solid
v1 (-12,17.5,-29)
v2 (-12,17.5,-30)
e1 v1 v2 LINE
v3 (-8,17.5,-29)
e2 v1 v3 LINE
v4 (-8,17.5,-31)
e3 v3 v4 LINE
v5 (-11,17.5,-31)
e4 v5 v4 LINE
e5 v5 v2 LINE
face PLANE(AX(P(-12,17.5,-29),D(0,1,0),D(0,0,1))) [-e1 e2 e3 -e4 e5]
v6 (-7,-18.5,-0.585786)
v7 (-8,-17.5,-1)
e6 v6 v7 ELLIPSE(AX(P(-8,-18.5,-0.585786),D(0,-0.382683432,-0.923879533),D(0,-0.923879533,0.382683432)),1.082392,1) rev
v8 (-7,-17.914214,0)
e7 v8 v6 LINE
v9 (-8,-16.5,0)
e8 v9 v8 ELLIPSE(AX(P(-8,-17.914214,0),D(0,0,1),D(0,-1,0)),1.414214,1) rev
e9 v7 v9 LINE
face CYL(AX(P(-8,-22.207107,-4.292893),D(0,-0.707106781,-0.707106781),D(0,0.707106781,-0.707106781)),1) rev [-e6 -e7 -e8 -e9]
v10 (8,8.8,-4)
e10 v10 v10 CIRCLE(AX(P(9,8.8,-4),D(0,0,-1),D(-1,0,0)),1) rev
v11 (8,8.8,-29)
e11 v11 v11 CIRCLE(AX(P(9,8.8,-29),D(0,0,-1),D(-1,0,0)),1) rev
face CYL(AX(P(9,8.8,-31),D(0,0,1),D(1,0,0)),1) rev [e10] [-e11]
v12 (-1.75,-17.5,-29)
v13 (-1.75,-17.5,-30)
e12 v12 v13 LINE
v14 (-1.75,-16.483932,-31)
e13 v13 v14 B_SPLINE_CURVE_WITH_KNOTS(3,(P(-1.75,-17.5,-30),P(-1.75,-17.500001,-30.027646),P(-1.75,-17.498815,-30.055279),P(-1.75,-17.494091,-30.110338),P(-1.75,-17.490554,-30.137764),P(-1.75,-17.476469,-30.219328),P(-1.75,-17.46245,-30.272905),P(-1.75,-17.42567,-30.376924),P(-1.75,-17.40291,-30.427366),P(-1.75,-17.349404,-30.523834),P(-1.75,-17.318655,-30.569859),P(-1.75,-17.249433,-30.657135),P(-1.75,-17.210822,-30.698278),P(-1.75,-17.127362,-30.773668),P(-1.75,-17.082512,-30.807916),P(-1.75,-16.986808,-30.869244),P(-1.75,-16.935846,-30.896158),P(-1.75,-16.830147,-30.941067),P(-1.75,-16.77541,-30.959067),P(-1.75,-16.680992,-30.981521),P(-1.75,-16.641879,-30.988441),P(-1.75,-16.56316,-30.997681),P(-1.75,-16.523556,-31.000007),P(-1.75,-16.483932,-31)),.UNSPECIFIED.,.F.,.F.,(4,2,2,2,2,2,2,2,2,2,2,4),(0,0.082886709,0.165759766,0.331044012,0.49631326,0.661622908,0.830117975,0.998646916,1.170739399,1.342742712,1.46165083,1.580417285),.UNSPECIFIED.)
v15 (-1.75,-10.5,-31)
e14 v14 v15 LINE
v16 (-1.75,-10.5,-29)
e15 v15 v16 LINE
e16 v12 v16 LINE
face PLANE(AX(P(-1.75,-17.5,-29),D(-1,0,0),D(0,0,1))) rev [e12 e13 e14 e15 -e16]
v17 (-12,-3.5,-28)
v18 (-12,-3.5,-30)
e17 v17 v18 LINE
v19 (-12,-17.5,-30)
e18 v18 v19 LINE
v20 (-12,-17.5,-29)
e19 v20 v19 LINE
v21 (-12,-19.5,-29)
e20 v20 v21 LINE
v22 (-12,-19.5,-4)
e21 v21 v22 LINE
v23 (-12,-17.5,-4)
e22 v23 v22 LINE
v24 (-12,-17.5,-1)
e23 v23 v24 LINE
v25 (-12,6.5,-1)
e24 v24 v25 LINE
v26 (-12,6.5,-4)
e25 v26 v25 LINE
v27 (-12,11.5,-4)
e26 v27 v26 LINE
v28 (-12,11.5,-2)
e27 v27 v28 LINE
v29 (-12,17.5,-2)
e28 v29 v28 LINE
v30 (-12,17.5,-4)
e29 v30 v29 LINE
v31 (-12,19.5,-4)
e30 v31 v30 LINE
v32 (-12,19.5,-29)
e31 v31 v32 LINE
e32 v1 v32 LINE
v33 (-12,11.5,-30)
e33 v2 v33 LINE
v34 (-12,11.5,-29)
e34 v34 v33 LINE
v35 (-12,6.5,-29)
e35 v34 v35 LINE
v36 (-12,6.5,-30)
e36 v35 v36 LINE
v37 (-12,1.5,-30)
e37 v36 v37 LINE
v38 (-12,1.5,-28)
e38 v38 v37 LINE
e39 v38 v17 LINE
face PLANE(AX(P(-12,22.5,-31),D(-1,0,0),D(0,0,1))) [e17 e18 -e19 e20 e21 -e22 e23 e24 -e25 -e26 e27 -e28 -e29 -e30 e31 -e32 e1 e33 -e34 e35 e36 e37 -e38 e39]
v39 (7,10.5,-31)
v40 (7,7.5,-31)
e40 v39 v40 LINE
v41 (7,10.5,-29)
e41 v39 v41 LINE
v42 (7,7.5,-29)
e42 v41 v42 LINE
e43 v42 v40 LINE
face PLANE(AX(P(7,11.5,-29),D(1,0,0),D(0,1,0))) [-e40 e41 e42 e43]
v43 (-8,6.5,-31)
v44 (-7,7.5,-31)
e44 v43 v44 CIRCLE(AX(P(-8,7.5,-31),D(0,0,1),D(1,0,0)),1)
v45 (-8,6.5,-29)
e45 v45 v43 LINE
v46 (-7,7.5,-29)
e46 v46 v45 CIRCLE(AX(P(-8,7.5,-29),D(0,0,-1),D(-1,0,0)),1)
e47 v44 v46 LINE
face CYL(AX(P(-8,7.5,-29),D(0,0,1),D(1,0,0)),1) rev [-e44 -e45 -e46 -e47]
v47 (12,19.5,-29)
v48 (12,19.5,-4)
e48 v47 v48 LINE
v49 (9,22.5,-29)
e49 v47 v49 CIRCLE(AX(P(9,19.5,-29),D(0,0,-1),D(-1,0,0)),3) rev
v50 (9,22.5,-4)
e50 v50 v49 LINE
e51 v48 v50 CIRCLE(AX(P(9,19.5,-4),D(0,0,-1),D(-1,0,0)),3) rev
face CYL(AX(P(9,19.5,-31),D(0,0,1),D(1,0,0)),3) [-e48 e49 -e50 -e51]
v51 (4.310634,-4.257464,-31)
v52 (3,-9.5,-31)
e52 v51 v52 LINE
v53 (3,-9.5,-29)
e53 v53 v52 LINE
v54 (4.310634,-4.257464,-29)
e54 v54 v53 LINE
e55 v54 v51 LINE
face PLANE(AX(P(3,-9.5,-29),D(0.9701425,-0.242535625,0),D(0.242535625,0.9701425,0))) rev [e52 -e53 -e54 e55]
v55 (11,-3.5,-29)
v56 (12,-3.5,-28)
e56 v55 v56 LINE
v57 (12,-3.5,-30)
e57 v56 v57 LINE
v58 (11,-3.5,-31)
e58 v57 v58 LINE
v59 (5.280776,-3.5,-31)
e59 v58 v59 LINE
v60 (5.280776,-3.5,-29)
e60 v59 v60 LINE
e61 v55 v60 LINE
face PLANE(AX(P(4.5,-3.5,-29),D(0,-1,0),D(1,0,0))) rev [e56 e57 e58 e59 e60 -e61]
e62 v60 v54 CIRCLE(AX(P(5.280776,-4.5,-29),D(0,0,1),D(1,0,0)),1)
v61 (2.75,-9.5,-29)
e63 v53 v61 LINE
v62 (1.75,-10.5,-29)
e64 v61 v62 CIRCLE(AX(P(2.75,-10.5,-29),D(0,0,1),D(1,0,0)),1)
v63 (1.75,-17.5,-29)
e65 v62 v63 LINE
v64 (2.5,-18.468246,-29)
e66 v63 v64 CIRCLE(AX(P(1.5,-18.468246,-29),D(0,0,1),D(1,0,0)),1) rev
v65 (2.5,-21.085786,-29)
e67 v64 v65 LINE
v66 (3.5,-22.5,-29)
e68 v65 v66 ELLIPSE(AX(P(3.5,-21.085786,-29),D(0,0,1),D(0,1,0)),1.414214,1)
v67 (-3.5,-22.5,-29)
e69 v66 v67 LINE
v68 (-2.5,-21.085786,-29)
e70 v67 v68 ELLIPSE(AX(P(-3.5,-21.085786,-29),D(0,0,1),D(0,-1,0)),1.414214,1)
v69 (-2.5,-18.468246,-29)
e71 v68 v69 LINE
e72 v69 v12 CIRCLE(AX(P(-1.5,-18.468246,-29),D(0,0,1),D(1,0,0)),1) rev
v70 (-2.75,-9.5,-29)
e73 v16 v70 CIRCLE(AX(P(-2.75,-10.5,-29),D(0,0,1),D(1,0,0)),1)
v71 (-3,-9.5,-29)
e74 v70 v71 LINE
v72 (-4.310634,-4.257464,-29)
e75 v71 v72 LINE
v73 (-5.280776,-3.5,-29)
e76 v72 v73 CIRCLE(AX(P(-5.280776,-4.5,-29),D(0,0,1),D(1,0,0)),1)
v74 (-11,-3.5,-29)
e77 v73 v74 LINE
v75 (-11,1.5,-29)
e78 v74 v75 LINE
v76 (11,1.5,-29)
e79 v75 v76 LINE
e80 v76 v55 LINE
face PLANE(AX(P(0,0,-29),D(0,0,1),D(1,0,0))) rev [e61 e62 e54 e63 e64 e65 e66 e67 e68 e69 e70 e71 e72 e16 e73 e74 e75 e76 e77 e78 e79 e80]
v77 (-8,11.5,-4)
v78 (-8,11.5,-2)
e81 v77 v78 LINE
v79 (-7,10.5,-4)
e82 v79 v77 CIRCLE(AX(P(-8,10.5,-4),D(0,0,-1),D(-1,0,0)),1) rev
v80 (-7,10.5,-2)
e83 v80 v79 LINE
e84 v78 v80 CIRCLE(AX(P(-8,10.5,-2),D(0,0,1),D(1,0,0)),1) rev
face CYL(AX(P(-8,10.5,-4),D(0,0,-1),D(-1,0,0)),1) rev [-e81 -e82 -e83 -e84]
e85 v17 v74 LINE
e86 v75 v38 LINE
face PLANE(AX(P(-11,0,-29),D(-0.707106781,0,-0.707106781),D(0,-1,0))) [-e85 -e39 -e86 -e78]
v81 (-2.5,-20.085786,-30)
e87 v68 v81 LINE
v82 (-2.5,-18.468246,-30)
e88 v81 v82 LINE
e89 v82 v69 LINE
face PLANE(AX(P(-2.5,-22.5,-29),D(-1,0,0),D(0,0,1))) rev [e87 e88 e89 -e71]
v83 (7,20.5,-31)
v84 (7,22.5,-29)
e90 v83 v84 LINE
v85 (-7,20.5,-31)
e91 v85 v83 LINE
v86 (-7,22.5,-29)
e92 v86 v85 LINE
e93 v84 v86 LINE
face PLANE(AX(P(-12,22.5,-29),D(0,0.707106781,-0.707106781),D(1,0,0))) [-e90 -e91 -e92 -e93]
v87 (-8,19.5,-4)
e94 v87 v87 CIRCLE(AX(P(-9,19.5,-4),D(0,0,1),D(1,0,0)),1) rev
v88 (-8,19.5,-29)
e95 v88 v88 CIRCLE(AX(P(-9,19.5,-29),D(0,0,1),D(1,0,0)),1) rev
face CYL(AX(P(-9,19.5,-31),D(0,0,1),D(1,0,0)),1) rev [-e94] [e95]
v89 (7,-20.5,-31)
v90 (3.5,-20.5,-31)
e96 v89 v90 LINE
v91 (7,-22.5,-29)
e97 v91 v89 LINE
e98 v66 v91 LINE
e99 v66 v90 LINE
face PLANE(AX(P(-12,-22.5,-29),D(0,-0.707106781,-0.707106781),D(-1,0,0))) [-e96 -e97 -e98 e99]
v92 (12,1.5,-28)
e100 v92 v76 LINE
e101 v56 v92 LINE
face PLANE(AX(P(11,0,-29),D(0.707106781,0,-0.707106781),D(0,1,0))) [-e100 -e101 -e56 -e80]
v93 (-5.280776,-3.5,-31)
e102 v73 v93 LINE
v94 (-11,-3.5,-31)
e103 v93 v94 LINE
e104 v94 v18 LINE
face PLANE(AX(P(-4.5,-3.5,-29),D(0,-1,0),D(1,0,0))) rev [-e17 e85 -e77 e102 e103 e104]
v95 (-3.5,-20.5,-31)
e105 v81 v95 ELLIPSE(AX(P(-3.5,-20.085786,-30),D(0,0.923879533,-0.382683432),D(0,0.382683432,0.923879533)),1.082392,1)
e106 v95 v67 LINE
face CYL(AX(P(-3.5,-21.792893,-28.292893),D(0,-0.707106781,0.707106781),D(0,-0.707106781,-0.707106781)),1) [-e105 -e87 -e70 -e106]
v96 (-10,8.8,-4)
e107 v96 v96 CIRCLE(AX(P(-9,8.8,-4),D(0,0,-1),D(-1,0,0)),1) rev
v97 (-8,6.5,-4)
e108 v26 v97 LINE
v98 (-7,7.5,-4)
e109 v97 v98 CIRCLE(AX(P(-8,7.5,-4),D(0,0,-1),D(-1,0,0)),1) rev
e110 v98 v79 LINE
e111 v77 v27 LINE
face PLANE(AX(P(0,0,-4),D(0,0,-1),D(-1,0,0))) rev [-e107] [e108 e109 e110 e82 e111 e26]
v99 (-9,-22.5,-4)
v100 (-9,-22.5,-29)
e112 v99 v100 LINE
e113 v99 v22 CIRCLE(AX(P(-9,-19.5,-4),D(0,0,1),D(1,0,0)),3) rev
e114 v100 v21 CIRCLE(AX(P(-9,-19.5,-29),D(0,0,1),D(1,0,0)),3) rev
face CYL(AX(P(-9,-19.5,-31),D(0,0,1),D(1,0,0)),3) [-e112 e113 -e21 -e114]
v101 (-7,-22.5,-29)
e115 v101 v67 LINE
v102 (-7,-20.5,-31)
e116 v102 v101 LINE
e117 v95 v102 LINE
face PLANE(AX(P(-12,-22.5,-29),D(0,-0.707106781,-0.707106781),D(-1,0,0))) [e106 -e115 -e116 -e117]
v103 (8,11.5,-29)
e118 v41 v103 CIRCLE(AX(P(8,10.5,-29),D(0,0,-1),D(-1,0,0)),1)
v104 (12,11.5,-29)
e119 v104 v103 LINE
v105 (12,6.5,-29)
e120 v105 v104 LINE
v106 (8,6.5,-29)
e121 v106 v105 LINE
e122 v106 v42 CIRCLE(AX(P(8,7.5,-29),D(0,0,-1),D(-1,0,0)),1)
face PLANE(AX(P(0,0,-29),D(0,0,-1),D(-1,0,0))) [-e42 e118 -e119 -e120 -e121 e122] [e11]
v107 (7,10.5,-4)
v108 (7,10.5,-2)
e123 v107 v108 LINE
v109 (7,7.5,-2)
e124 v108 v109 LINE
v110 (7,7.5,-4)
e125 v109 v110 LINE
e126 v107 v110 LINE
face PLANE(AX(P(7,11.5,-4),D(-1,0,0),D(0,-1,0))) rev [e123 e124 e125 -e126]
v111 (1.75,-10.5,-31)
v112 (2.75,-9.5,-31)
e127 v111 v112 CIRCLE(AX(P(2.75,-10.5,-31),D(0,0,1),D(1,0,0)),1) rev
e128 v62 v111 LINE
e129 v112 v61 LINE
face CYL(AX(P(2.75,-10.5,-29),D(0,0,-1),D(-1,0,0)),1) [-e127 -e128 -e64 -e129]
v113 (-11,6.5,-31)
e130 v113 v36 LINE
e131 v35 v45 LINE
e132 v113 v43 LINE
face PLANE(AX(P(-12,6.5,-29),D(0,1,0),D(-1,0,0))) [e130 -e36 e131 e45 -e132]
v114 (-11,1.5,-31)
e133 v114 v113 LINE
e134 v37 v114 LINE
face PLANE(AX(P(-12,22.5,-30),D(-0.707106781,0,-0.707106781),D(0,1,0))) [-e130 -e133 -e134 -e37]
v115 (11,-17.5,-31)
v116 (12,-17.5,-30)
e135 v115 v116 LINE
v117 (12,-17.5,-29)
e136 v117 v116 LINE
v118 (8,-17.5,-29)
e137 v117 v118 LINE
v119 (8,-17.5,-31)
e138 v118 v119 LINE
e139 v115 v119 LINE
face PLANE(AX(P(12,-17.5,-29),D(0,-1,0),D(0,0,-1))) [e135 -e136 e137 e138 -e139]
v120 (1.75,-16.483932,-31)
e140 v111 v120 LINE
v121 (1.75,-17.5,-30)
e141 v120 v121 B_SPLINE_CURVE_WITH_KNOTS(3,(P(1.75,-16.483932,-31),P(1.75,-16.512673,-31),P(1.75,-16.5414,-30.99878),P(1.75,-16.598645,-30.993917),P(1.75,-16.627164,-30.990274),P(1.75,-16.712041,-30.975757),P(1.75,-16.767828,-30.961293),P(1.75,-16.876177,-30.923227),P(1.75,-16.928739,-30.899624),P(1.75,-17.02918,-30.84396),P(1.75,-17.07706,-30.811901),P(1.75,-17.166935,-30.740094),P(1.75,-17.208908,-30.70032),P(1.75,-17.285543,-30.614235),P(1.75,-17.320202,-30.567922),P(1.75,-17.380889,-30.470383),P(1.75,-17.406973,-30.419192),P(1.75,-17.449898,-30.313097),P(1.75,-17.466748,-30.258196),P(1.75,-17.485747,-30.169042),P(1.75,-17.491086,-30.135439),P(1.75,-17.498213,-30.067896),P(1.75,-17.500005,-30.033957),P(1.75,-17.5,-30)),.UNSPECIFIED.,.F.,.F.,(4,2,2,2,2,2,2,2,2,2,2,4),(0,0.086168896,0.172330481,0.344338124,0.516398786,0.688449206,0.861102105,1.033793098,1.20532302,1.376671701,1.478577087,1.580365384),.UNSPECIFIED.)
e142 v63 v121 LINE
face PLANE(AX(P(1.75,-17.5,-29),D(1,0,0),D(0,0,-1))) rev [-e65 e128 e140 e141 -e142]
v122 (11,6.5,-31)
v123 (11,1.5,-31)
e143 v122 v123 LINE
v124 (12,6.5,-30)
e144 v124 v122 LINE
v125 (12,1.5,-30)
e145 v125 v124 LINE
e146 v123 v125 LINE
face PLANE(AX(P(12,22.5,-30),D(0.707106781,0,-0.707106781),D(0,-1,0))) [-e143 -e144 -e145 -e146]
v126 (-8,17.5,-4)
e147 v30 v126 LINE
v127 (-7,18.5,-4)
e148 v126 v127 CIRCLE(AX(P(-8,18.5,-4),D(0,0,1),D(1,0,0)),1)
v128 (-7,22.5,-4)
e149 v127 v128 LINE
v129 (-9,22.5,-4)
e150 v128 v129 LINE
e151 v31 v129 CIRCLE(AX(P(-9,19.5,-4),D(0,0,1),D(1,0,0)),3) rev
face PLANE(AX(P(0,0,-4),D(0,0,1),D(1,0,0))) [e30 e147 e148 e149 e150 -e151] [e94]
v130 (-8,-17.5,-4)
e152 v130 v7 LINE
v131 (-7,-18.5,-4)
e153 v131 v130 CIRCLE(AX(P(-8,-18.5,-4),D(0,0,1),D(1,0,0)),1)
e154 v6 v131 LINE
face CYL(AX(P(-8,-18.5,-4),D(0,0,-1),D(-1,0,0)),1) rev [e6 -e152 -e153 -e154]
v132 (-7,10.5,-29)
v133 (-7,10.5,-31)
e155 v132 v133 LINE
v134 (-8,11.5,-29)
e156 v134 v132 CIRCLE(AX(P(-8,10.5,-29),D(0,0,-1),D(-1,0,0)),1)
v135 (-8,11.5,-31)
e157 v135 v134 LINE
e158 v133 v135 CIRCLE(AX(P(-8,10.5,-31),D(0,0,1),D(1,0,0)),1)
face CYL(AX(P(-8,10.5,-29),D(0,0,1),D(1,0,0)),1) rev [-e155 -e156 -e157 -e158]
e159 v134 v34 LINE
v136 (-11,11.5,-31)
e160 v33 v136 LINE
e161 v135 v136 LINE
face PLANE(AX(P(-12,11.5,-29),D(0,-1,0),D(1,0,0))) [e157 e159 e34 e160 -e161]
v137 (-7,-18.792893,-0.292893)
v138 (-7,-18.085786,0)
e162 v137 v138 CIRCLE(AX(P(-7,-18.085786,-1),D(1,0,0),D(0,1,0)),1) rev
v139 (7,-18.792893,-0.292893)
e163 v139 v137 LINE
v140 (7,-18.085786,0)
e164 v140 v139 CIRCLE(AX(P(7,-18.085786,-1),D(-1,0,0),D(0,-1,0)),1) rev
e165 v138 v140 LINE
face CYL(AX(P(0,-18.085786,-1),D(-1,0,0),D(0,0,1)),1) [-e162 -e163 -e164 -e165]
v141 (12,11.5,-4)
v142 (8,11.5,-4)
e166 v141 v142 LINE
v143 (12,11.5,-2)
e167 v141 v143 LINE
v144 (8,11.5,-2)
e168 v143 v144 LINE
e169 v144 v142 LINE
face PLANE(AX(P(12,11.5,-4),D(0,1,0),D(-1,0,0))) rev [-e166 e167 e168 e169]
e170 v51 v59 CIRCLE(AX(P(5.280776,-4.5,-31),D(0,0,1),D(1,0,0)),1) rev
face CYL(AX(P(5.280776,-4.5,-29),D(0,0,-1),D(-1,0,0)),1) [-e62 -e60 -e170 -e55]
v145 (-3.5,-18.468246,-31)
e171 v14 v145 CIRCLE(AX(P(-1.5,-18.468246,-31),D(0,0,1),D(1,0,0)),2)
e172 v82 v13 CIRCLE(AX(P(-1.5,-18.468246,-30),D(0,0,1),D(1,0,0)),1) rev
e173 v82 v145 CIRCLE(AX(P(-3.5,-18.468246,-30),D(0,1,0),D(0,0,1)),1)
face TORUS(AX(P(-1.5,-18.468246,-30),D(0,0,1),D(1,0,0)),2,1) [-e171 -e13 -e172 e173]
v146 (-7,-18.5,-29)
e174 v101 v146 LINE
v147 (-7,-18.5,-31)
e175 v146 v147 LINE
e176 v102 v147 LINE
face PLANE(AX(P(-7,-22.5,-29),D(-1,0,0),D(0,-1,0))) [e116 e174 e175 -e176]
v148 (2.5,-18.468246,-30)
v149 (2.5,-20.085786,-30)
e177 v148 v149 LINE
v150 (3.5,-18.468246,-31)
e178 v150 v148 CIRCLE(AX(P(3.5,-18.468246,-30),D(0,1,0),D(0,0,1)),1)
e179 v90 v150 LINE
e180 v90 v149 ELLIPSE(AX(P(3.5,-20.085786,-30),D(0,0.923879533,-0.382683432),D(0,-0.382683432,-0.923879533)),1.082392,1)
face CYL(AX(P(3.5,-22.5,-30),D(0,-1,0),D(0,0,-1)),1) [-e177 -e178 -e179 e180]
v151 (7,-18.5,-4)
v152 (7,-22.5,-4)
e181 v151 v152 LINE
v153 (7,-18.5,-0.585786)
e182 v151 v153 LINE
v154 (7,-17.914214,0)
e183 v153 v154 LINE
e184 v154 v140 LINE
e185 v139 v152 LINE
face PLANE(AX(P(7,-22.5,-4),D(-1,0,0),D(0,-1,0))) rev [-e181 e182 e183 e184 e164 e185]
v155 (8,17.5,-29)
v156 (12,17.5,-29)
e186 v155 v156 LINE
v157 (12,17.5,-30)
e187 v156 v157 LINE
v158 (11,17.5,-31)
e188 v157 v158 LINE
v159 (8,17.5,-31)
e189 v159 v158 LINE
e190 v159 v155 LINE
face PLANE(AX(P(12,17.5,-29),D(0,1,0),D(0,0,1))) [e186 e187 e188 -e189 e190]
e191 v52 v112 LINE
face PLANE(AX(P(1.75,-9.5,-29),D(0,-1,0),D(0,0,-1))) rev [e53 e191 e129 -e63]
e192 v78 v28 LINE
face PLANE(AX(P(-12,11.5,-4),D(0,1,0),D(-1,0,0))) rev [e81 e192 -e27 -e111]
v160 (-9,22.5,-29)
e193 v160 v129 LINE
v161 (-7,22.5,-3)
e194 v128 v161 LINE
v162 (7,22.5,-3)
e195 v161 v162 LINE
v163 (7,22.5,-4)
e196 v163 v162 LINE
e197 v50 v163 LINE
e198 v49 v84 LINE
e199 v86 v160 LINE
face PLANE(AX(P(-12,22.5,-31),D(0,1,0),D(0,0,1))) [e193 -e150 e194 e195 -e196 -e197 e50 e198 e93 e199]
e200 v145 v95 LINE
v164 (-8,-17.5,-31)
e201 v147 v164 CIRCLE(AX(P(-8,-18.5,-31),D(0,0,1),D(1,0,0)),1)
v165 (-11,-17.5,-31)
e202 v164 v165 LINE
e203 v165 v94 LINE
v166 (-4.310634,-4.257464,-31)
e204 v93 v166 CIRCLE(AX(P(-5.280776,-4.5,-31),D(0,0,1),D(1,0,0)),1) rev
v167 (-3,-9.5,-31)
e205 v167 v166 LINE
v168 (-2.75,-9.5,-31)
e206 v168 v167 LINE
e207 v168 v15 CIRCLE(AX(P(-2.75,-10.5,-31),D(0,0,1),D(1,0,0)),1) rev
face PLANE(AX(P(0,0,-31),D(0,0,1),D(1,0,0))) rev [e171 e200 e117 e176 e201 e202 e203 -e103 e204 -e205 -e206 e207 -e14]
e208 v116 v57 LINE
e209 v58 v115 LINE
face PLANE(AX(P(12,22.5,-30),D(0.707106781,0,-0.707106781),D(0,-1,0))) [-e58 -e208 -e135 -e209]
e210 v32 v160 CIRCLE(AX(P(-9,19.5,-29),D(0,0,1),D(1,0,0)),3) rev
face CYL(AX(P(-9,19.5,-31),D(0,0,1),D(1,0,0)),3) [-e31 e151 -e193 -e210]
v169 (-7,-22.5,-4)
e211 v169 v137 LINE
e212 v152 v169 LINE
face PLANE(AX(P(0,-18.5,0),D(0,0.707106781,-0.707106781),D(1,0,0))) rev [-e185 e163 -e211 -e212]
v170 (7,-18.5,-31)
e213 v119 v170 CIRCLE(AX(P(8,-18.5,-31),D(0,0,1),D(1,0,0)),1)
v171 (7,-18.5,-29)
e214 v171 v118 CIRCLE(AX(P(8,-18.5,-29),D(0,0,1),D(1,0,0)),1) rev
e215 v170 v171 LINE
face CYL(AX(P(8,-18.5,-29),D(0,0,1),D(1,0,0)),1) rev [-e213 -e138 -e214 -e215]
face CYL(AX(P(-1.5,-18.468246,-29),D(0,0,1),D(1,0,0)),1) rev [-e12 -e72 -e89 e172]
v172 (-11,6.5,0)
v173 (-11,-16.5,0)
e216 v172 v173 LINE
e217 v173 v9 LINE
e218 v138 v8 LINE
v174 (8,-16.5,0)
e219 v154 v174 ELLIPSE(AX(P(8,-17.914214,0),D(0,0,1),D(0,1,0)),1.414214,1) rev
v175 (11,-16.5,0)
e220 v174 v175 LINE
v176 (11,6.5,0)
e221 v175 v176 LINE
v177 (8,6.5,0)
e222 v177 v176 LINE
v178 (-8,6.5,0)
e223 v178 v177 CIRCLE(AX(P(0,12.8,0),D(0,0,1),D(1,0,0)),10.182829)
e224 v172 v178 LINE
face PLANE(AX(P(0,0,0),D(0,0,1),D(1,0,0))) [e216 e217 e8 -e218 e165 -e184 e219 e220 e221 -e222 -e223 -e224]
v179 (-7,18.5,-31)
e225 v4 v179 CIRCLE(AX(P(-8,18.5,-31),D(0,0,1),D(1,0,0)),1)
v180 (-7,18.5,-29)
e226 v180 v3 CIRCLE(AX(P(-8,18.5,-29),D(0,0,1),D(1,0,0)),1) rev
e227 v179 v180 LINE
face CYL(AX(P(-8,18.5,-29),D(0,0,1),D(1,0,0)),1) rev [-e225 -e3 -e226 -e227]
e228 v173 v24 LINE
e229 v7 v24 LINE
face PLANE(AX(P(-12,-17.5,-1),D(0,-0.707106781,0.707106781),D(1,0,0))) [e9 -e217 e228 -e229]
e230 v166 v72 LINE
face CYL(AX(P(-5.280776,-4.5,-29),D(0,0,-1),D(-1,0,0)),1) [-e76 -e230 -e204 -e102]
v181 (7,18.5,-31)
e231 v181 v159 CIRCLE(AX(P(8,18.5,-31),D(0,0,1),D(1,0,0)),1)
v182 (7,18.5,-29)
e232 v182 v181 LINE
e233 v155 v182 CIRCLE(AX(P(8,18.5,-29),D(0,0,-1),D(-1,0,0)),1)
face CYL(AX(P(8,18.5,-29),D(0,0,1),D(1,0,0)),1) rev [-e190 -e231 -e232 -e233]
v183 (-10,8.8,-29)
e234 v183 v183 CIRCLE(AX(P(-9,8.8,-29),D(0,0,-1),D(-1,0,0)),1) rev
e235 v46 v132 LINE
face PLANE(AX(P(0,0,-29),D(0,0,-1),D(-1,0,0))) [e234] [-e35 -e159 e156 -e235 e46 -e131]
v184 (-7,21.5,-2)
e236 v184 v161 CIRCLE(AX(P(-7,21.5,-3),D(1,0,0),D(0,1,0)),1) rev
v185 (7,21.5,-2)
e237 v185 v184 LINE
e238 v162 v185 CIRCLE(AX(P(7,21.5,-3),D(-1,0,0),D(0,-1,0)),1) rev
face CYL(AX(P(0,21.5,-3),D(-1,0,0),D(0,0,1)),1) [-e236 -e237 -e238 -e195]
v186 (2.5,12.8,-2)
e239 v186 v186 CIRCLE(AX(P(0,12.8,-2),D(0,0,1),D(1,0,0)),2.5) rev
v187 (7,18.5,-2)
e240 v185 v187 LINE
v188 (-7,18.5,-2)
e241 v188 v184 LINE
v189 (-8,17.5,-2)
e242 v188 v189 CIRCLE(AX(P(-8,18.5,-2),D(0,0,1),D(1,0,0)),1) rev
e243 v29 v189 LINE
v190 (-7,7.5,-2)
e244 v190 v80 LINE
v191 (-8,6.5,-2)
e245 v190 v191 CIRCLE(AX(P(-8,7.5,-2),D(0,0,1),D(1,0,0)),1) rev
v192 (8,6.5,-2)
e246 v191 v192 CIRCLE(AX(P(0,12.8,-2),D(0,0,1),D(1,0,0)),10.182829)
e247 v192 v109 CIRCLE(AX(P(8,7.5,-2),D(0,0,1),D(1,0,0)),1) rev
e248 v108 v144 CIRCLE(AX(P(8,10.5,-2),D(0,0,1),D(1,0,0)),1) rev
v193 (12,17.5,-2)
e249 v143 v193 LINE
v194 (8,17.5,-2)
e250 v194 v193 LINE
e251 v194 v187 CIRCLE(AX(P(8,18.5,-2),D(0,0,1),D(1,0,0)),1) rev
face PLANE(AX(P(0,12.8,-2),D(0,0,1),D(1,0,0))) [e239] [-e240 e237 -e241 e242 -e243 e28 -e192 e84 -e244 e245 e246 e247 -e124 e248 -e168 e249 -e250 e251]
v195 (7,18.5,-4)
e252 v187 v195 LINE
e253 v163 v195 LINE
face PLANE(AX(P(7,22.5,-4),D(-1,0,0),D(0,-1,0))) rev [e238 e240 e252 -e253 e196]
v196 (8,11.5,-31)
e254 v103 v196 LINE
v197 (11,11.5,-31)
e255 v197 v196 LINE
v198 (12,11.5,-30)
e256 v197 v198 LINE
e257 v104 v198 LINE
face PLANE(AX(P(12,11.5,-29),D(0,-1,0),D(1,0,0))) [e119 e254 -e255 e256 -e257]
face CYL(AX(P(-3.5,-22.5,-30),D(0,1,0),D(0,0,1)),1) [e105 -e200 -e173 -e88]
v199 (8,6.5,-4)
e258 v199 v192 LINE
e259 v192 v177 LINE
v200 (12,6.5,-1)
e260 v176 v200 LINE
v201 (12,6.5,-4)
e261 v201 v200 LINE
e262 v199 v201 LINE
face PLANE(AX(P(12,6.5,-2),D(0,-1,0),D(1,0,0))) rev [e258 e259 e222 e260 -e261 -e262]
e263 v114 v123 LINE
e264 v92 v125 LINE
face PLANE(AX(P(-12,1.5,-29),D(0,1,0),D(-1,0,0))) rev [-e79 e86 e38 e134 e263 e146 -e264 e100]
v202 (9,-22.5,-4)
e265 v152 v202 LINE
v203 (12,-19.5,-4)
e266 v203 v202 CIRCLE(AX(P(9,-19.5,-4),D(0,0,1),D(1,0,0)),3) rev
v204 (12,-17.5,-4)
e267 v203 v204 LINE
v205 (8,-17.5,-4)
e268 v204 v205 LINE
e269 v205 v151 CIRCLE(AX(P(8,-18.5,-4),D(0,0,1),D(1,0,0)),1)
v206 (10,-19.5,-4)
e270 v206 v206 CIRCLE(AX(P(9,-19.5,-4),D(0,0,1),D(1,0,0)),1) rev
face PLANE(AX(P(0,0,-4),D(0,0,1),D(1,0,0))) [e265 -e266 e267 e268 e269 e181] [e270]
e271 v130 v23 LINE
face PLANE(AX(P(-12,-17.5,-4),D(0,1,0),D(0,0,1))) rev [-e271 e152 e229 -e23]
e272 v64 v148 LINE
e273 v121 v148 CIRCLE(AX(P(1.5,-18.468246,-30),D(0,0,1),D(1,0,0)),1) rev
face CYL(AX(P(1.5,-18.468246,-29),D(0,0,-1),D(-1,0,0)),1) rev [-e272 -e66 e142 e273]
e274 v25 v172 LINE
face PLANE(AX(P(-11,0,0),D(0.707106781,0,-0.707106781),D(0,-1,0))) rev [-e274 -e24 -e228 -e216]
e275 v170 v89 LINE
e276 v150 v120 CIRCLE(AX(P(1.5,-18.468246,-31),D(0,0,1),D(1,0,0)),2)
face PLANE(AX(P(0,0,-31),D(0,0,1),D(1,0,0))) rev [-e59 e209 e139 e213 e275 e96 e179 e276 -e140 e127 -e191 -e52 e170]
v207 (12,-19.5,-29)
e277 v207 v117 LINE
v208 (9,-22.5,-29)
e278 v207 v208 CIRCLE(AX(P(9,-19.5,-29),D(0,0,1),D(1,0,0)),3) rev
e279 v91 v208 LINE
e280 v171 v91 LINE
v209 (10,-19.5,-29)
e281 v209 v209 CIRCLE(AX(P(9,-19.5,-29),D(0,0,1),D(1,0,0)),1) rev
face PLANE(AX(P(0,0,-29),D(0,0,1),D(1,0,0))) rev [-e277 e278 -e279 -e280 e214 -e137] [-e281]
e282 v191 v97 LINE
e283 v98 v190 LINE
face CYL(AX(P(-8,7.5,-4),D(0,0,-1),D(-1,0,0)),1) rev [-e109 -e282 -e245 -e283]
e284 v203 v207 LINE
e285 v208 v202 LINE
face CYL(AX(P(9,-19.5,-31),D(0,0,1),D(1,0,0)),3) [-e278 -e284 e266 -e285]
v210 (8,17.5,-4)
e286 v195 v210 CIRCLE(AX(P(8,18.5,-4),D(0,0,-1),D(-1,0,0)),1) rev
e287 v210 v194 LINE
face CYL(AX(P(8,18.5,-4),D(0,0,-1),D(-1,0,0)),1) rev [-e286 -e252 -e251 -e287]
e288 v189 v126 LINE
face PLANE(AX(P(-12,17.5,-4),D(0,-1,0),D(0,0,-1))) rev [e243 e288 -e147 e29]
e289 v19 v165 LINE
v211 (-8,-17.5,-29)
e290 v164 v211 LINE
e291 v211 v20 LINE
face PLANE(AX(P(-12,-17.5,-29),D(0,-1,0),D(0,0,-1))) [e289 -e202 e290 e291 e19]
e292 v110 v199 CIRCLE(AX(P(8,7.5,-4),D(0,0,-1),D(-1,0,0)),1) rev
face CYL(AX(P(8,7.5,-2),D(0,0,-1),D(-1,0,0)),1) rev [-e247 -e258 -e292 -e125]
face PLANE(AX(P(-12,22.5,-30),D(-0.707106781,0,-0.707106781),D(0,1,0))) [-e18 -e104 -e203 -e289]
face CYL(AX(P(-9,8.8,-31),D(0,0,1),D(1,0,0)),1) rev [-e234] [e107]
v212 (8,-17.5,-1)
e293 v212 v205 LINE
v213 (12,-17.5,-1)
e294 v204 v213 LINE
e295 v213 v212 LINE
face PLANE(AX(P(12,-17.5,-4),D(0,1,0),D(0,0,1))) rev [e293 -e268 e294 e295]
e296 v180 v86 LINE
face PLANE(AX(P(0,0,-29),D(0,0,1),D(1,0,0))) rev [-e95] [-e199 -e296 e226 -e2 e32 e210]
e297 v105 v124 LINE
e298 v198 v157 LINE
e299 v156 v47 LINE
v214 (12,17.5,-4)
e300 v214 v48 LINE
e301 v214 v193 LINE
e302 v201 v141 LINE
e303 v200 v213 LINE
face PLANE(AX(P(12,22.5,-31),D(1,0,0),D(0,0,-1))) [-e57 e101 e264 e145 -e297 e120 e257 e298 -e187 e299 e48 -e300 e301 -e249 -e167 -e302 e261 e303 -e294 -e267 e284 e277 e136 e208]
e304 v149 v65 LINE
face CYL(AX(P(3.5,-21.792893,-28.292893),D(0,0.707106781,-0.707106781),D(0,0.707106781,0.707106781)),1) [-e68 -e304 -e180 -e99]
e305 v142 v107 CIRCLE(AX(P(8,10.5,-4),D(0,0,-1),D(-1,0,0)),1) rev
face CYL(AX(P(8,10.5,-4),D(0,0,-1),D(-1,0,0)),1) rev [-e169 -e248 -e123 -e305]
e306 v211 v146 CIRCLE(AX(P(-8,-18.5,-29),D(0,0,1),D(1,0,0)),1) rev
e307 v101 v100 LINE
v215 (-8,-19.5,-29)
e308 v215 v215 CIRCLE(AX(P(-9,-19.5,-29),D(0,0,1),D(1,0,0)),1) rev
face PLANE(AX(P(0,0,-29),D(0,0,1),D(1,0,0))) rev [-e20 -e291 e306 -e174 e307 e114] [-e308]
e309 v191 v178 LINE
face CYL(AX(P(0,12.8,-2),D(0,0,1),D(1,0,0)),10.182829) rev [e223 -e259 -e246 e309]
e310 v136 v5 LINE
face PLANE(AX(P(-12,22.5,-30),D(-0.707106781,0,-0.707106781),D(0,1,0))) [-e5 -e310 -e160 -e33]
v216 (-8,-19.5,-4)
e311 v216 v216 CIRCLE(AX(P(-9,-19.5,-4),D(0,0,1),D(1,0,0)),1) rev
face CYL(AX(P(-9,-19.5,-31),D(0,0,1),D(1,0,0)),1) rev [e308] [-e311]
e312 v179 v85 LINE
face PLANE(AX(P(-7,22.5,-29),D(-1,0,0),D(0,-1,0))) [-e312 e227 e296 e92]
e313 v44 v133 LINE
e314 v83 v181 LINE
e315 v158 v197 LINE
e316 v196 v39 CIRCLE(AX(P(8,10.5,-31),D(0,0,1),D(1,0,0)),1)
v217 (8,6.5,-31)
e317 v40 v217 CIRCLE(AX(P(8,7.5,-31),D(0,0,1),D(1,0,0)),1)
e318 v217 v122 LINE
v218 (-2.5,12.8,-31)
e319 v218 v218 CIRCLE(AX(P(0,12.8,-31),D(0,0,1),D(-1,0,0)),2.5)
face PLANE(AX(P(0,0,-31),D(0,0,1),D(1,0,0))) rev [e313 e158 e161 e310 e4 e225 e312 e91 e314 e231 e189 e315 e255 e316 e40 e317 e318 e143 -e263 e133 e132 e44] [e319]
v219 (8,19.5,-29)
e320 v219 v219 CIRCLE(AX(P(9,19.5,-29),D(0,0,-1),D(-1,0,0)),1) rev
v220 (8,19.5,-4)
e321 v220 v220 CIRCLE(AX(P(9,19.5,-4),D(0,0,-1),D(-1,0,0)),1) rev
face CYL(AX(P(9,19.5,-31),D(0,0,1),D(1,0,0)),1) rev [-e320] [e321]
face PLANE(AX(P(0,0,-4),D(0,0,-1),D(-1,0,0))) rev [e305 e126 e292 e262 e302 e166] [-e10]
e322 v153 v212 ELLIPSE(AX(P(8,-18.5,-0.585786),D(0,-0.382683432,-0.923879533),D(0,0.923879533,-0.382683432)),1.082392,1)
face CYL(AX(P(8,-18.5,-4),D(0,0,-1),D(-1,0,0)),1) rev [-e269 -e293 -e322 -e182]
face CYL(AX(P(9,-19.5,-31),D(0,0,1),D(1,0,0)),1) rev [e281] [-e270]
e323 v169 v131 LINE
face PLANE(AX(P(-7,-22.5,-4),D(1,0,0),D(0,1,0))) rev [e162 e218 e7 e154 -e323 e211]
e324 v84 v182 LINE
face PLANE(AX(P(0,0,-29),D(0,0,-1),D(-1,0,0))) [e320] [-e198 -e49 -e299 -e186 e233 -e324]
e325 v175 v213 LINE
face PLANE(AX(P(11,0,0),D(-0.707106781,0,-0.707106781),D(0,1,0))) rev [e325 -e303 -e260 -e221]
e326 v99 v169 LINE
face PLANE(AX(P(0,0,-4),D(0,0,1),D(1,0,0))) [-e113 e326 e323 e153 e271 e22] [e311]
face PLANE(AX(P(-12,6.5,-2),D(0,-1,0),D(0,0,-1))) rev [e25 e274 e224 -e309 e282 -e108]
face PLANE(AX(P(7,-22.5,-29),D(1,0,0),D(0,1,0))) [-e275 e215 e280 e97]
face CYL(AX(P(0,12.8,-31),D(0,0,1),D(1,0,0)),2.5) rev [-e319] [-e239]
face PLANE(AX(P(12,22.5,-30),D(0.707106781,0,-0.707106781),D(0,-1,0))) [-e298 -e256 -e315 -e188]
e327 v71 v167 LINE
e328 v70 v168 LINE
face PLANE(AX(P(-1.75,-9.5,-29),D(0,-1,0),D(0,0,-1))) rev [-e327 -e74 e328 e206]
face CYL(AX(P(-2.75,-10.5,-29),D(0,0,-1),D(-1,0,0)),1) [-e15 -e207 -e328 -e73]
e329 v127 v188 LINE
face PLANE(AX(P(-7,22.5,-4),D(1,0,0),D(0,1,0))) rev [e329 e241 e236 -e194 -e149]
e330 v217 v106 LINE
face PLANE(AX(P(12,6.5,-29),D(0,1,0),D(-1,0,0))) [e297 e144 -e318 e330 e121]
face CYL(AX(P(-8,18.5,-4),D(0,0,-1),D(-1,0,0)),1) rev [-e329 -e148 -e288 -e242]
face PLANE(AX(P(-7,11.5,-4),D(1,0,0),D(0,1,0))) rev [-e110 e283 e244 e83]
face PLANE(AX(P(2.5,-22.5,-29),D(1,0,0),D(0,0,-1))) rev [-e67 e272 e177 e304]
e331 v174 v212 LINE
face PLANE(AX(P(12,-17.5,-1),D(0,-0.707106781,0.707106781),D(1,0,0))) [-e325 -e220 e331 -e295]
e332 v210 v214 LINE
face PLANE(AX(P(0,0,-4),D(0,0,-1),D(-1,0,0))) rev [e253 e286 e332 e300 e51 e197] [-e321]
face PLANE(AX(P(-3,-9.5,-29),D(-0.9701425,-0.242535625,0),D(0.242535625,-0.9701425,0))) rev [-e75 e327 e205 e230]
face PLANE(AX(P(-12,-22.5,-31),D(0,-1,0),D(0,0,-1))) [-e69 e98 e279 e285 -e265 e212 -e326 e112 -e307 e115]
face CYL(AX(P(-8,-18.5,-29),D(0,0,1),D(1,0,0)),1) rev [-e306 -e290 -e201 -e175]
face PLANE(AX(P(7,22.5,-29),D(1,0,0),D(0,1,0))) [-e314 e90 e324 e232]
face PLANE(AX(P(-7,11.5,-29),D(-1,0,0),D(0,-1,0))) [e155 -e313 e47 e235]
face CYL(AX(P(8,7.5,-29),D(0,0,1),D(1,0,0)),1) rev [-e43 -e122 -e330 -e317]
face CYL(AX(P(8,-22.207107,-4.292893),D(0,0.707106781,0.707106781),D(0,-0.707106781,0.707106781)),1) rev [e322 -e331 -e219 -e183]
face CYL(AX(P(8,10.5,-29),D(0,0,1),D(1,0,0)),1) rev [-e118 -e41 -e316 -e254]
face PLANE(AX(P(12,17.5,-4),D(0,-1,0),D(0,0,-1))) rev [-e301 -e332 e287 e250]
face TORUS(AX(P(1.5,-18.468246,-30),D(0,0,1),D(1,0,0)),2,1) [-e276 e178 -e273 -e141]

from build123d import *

# Parameters (mm, degrees)
ESQUISSE1_W             = 24
ESQUISSE1_H             = 45
ESQUISSE1_R             = 1
ESQUISSE1_R_2           = 2.5
BOSS_EXTRU_1_DEPTH      = 31
ENL_V_MAT_EXTRU_1_DEPTH = 2
CONG_2_R                = 3
ESQUISSE3_W             = 5
ESQUISSE3_H             = 5
ENL_V_MAT_EXTRU_2_DEPTH = 4
ESQUISSE4_W             = 5
ESQUISSE4_H             = 5
ENL_V_MAT_EXTRU_3_DEPTH = 2
ENL_V_MAT_EXTRU_4_DEPTH = 2
CHANFREIN1_SIZE         = 4
CHANFREIN2_SIZE         = 1
CHANFREIN3_SIZE         = 2
CONG_3_R                = 1


with BuildPart() as part:
    # Esquisse1 → Boss.-Extru.1 (new body)
    with BuildSketch(Plane.XY):
        Rectangle(ESQUISSE1_W, ESQUISSE1_H)
        with Locations((9, 19.5)):
            Circle(ESQUISSE1_R, mode=Mode.SUBTRACT)
        with Locations((9, 8.8)):
            Circle(ESQUISSE1_R, mode=Mode.SUBTRACT)
        with Locations(Location((0, 12.8, 0), (0, 0, 180))):
            Circle(ESQUISSE1_R_2, mode=Mode.SUBTRACT)
        with Locations(Location((-9, 19.5, 0), (0, 0, 180))):
            Circle(ESQUISSE1_R, mode=Mode.SUBTRACT)
        with Locations(Location((-9, 8.8, 0), (0, 0, 180))):
            Circle(ESQUISSE1_R, mode=Mode.SUBTRACT)
        with Locations(Location((9, -19.5, 0), (0, 0, 180))):
            Circle(ESQUISSE1_R, mode=Mode.SUBTRACT)
        with Locations((-9, -19.5)):
            Circle(ESQUISSE1_R, mode=Mode.SUBTRACT)
    extrude(amount=-BOSS_EXTRU_1_DEPTH)

    # Esquisse2 → Enlèv. mat.-Extru.1 (cut)
    with BuildSketch(Plane.XY):
        with BuildLine():
            Line((-12, 22.5), (12, 22.5))
            Line((12, 22.5), (12, 6.5))
            Line((12, 6.5), (8, 6.5))
            ThreePointArc((8, 6.5), (0, 2.617171316), (-8, 6.5))
            Line((-8, 6.5), (-12, 6.5))
            Line((-12, 6.5), (-12, 22.5))
        make_face()
    extrude(amount=-ENL_V_MAT_EXTRU_1_DEPTH, mode=Mode.SUBTRACT)

    # Congé2
    cong_2_edges = [part.edges().sort_by_distance(p)[0] for p in [
        (12, -22.5, -15.5),
        (-12, -22.5, -15.5),
        (-12, 22.5, -16.5),
        (12, 22.5, -16.5),
    ]]
    fillet(cong_2_edges, radius=CONG_2_R)

    # Esquisse3 → Enlèv. mat.-Extru.2 (cut)
    with BuildSketch(Plane.XY):
        with Locations((9.5, 20)):
            Rectangle(ESQUISSE3_W, ESQUISSE3_H)
        with Locations((9.5, 9)):
            Rectangle(ESQUISSE3_W, ESQUISSE3_H)
        with Locations((-9.5, 20)):
            Rectangle(ESQUISSE3_W, ESQUISSE3_H)
        with Locations((-9.5, 9)):
            Rectangle(ESQUISSE3_W, ESQUISSE3_H)
        with Locations((-9.5, -20)):
            Rectangle(ESQUISSE3_W, ESQUISSE3_H)
        with Locations((9.5, -20)):
            Rectangle(ESQUISSE3_W, ESQUISSE3_H)
    extrude(amount=-ENL_V_MAT_EXTRU_2_DEPTH, mode=Mode.SUBTRACT)

    # Esquisse4 → Enlèv. mat.-Extru.3 (cut)
    with BuildSketch(Plane.XY.offset(-31)):
        with Locations((9.5, 20)):
            Rectangle(ESQUISSE4_W, ESQUISSE4_H)
        with Locations((9.5, 9)):
            Rectangle(ESQUISSE4_W, ESQUISSE4_H)
        with Locations((-9.5, 20)):
            Rectangle(ESQUISSE4_W, ESQUISSE4_H)
        with Locations((-9.5, 9)):
            Rectangle(ESQUISSE4_W, ESQUISSE4_H)
        with Locations((-9.5, -20)):
            Rectangle(ESQUISSE4_W, ESQUISSE4_H)
        with Locations((9.5, -20)):
            Rectangle(ESQUISSE4_W, ESQUISSE4_H)
    extrude(amount=ENL_V_MAT_EXTRU_3_DEPTH, mode=Mode.SUBTRACT)

    # Esquisse5 → Enlèv. mat.-Extru.4 (cut)
    with BuildSketch(Plane(origin=(0, 0, -31), x_dir=(-1, 0, 0), z_dir=(0, 0, -1))):
        Polygon((-2.5, -22.5), (2.5, -22.5), (2.5, -17.5), (1.75, -17.5), (1.75, -9.5), (3, -9.5), (4.5, -3.5), (12, -3.5), (12, 1.5), (-12, 1.5), (-12, -3.5), (-4.5, -3.5), (-3, -9.5), (-1.75, -9.5), (-1.75, -17.5), (-2.5, -17.5), align=None)
    extrude(amount=-ENL_V_MAT_EXTRU_4_DEPTH, mode=Mode.SUBTRACT)

    # Chanfrein1
    chanfrein1_edges = [part.edges().sort_by_distance(p)[0] for p in [
        (0, -22.5, 0),
    ]]
    chamfer(chanfrein1_edges, length=CHANFREIN1_SIZE)

    # Chanfrein2
    chanfrein2_edges = [part.edges().sort_by_distance(p)[0] for p in [
        (-9.5, -17.5, 0),
        (12, -5.5, 0),
        (9.5, -17.5, 0),
        (12, 14.5, -31),
        (-12, 14.5, -31),
        (-12, 4, -31),
        (12, -10.5, -31),
        (-12, -10.5, -31),
        (12, 4, -31),
        (12, -1, -29),
        (-12, -1, -29),
        (-12, -5.5, 0),
    ]]
    chamfer(chanfrein2_edges, length=CHANFREIN2_SIZE)

    # Chanfrein3
    chanfrein3_edges = [part.edges().sort_by_distance(p)[0] for p in [
        (0, 22.5, -31),
        (4.75, -22.5, -31),
        (-4.75, -22.5, -31),
    ]]
    chamfer(chanfrein3_edges, length=CHANFREIN3_SIZE)

    # Congé3
    # the kernel refuses this fillet: 1 mm, written as the material it adds along each edge
    with BuildSketch(Plane(origin=(2.5, -17.5, -31), x_dir=(0, -1, 0), z_dir=(0, 0, 1))) as cong_3_piece_1:
        with BuildLine():
            CenterArc((0.968245837, -1), CONG_3_R, 90, 75.522487814)
            Line((0, -0.75), (0, 0))
            Line((0, 0), (0.968245837, 0))
        make_face()
    extrude(amount=4.420614591)
    with BuildSketch(Plane(origin=(-2.5, -17.5, -31), x_dir=(1, 0, 0), z_dir=(0, 0, 1))) as cong_3_piece_2:
        with BuildLine():
            CenterArc((1, -0.968245837), CONG_3_R, 104.477512186, 75.522487814)
            Line((0, -0.968245837), (0, 0))
            Line((0, 0), (0.75, 0))
        make_face()
    extrude(amount=4.420614591)
    with BuildSketch(Plane(origin=(7, -17.5, -31), x_dir=(1, 0, 0), z_dir=(0, 0, 1)), Plane(origin=(7, 6.5, -31), x_dir=(0, 1, 0), z_dir=(0, 0, 1)), Plane(origin=(7, 11.5, -31), x_dir=(1, 0, 0), z_dir=(0, 0, 1)), Plane(origin=(7, 17.5, -31), x_dir=(0, 1, 0), z_dir=(0, 0, 1)), Plane(origin=(-7, 11.5, -2), x_dir=(-1, 0, 0), z_dir=(0, 0, -1)), Plane(origin=(7, 6.5, -2), x_dir=(1, 0, 0), z_dir=(0, 0, -1)), Plane(origin=(-7, 17.5, -2), x_dir=(0, 1, 0), z_dir=(0, 0, -1))) as cong_3_piece_3:
        with BuildLine():
            CenterArc((CONG_3_R, -CONG_3_R), CONG_3_R, 90, 90)
            Line((0, -CONG_3_R), (0, 0))
            Line((0, 0), (CONG_3_R, 0))
        make_face()
    extrude(amount=4.5)
    with BuildSketch(Plane(origin=(-7, -17.5, -31), x_dir=(-1, 0, 0), z_dir=(0, 0, 1)), Plane(origin=(-7, 6.5, -31), x_dir=(0, 1, 0), z_dir=(0, 0, 1)), Plane(origin=(-7, 11.5, -31), x_dir=(-1, 0, 0), z_dir=(0, 0, 1)), Plane(origin=(-7, 17.5, -31), x_dir=(0, 1, 0), z_dir=(0, 0, 1)), Plane(origin=(-7, 6.5, -2), x_dir=(-1, 0, 0), z_dir=(0, 0, -1)), Plane(origin=(7, 11.5, -2), x_dir=(1, 0, 0), z_dir=(0, 0, -1)), Plane(origin=(7, 17.5, -2), x_dir=(0, 1, 0), z_dir=(0, 0, -1))) as cong_3_piece_4:
        with BuildLine():
            CenterArc((CONG_3_R, CONG_3_R), CONG_3_R, 180, 90)
            Line((0, CONG_3_R), (0, 0))
            Line((0, 0), (CONG_3_R, 0))
        make_face()
    extrude(amount=4.5)
    with BuildSketch(Plane(origin=(7, -14.732233047, 1.767766953), x_dir=(0, -0.7071067811865476, 0.7071067811865476), z_dir=(0, -0.7071067811865476, -0.7071067811865476))) as cong_3_piece_5_section:
        with BuildLine():
            CenterArc((CONG_3_R, -CONG_3_R), CONG_3_R, 90, 90)
            Line((0, -CONG_3_R), (0, 0))
            Line((0, 0), (CONG_3_R, 0))
        make_face()
    cong_3_piece_5 = extrude(amount=6.414213562, mode=Mode.PRIVATE)
    cong_3_piece_5 = split(cong_3_piece_5, bisect_by=Plane(origin=(7, -17.5, 1.767766953), z_dir=(0, 1, 0)), keep=Keep.TOP, mode=Mode.PRIVATE)
    cong_3_piece_5 = split(cong_3_piece_5, bisect_by=Plane(origin=(7, -14.732233047, 0), z_dir=(0, 0, -1)), keep=Keep.TOP, mode=Mode.PRIVATE)
    add(cong_3_piece_5)
    with BuildSketch(Plane(origin=(7, -17.5, 1.5), x_dir=(1, 0, 0), z_dir=(0, 0, -1))) as cong_3_piece_6_section:
        with BuildLine():
            CenterArc((CONG_3_R, CONG_3_R), CONG_3_R, 180, 90)
            Line((0, CONG_3_R), (0, 0))
            Line((0, 0), (CONG_3_R, 0))
        make_face()
    cong_3_piece_6 = extrude(amount=8, mode=Mode.PRIVATE)
    cong_3_piece_6 = split(cong_3_piece_6, bisect_by=Plane(origin=(7, -16.25, 0.25), z_dir=(0, 0.7071067811865476, -0.7071067811865476)), keep=Keep.TOP, mode=Mode.PRIVATE)
    add(cong_3_piece_6)
    with BuildSketch(Plane(origin=(-7, -17.5, 1.5), x_dir=(-1, 0, 0), z_dir=(0, 0, -1))) as cong_3_piece_7_section:
        with BuildLine():
            CenterArc((CONG_3_R, -CONG_3_R), CONG_3_R, 90, 90)
            Line((0, -CONG_3_R), (0, 0))
            Line((0, 0), (CONG_3_R, 0))
        make_face()
    cong_3_piece_7 = extrude(amount=8, mode=Mode.PRIVATE)
    cong_3_piece_7 = split(cong_3_piece_7, bisect_by=Plane(origin=(-7, -16.25, 0.25), z_dir=(0, 0.7071067811865476, -0.7071067811865476)), keep=Keep.TOP, mode=Mode.PRIVATE)
    add(cong_3_piece_7)
    with BuildSketch(Plane(origin=(-7, -14.732233047, 1.767766953), x_dir=(-1, 0, 0), z_dir=(0, -0.7071067811865476, -0.7071067811865476))) as cong_3_piece_8_section:
        with BuildLine():
            CenterArc((CONG_3_R, -CONG_3_R), CONG_3_R, 90, 90)
            Line((0, -CONG_3_R), (0, 0))
            Line((0, 0), (CONG_3_R, 0))
        make_face()
    cong_3_piece_8 = extrude(amount=6.414213562, mode=Mode.PRIVATE)
    cong_3_piece_8 = split(cong_3_piece_8, bisect_by=Plane(origin=(-7, -17.5, 1.767766953), z_dir=(0, 1, 0)), keep=Keep.TOP, mode=Mode.PRIVATE)
    cong_3_piece_8 = split(cong_3_piece_8, bisect_by=Plane(origin=(-7, -14.732233047, 0), z_dir=(0, 0, -1)), keep=Keep.TOP, mode=Mode.PRIVATE)
    add(cong_3_piece_8)
    with BuildSketch(Plane(origin=(7, -17.5, 1.5), x_dir=(1, 0, 0), z_dir=(0, 0, -1))) as cong_3_piece_9a_section:
        with BuildLine():
            CenterArc((CONG_3_R, CONG_3_R), CONG_3_R, 180, 90)
            Line((0, CONG_3_R), (0, 0))
            Line((0, 0), (CONG_3_R, 0))
        make_face()
    cong_3_piece_9a = extrude(amount=5.5, mode=Mode.PRIVATE)
    cong_3_piece_9a = split(cong_3_piece_9a, bisect_by=Plane(origin=(7, -17.5, 0), z_dir=(0, 0, -1)), keep=Keep.TOP, mode=Mode.PRIVATE)
    cong_3_piece_9a = split(cong_3_piece_9a, bisect_by=Plane(origin=(7, -16.25, 0.25), z_dir=(0, -0.7071067811865476, 0.7071067811865476)), keep=Keep.TOP, mode=Mode.PRIVATE)
    with BuildSketch(Plane(origin=(7, -14.732233047, 1.767766953), x_dir=(0, -0.7071067811865476, 0.7071067811865476), z_dir=(0, -0.7071067811865476, -0.7071067811865476))) as cong_3_piece_9b_section:
        with BuildLine():
            CenterArc((CONG_3_R, -CONG_3_R), CONG_3_R, 90, 90)
            Line((0, -CONG_3_R), (0, 0))
            Line((0, 0), (CONG_3_R, 0))
        make_face()
    cong_3_piece_9b = extrude(amount=6.414213562, mode=Mode.PRIVATE)
    cong_3_piece_9b = split(cong_3_piece_9b, bisect_by=Plane(origin=(7, -17.5, 1.767766953), z_dir=(0, -1, 0)), keep=Keep.TOP, mode=Mode.PRIVATE)
    cong_3_piece_9b = split(cong_3_piece_9b, bisect_by=Plane(origin=(7, -14.732233047, 0), z_dir=(0, 0, -1)), keep=Keep.TOP, mode=Mode.PRIVATE)
    cong_3_piece_9 = cong_3_piece_9a & cong_3_piece_9b
    add(cong_3_piece_9)
    with BuildSketch(Plane(origin=(-7, -17.5, 1.5), x_dir=(-1, 0, 0), z_dir=(0, 0, -1))) as cong_3_piece_10a_section:
        with BuildLine():
            CenterArc((CONG_3_R, -CONG_3_R), CONG_3_R, 90, 90)
            Line((0, -CONG_3_R), (0, 0))
            Line((0, 0), (CONG_3_R, 0))
        make_face()
    cong_3_piece_10a = extrude(amount=5.5, mode=Mode.PRIVATE)
    cong_3_piece_10a = split(cong_3_piece_10a, bisect_by=Plane(origin=(-7, -17.5, 0), z_dir=(0, 0, -1)), keep=Keep.TOP, mode=Mode.PRIVATE)
    cong_3_piece_10a = split(cong_3_piece_10a, bisect_by=Plane(origin=(-7, -16.25, 0.25), z_dir=(0, -0.7071067811865476, 0.7071067811865476)), keep=Keep.TOP, mode=Mode.PRIVATE)
    with BuildSketch(Plane(origin=(-7, -14.732233047, 1.767766953), x_dir=(-1, 0, 0), z_dir=(0, -0.7071067811865476, -0.7071067811865476))) as cong_3_piece_10b_section:
        with BuildLine():
            CenterArc((CONG_3_R, -CONG_3_R), CONG_3_R, 90, 90)
            Line((0, -CONG_3_R), (0, 0))
            Line((0, 0), (CONG_3_R, 0))
        make_face()
    cong_3_piece_10b = extrude(amount=6.414213562, mode=Mode.PRIVATE)
    cong_3_piece_10b = split(cong_3_piece_10b, bisect_by=Plane(origin=(-7, -17.5, 1.767766953), z_dir=(0, -1, 0)), keep=Keep.TOP, mode=Mode.PRIVATE)
    cong_3_piece_10b = split(cong_3_piece_10b, bisect_by=Plane(origin=(-7, -14.732233047, 0), z_dir=(0, 0, -1)), keep=Keep.TOP, mode=Mode.PRIVATE)
    cong_3_piece_10 = cong_3_piece_10a & cong_3_piece_10b
    add(cong_3_piece_10)
    # the kernel refuses this fillet: 1 mm, written as the material it takes off along each edge
    with BuildSketch(Plane(origin=(1.75, -9.5, -33.5), x_dir=(1, 0, 0), z_dir=(0, 0, 1)), Plane(origin=(-1.75, -9.5, -33.5), x_dir=(0, -1, 0), z_dir=(0, 0, 1))) as cong_3_2_piece_1:
        with BuildLine():
            CenterArc((CONG_3_R, -CONG_3_R), CONG_3_R, 90, 90)
            Line((0, -CONG_3_R), (0, 0))
            Line((0, 0), (CONG_3_R, 0))
        make_face()
    extrude(amount=4.5, mode=Mode.SUBTRACT)
    with BuildSketch(Plane(origin=(2.5, -18.468245837, -31), x_dir=(1, 0, 0), z_dir=(0, -1, 0)), Plane(origin=(-2.5, -23, -31), x_dir=(-1, 0, 0), z_dir=(0, 1, 0))) as cong_3_2_piece_2:
        with BuildLine():
            CenterArc((CONG_3_R, CONG_3_R), CONG_3_R, 180, 90)
            Line((0, CONG_3_R), (0, 0))
            Line((0, 0), (CONG_3_R, 0))
        make_face()
    extrude(amount=4.531754163, mode=Mode.SUBTRACT)
    with BuildSketch(Plane(origin=(2.5, -24.267766953, -27.232233047), x_dir=(0, 0.7071067811865476, 0.7071067811865476), z_dir=(0, 0.7071067811865476, -0.7071067811865476))) as cong_3_2_piece_3_section:
        with BuildLine():
            CenterArc((CONG_3_R, CONG_3_R), CONG_3_R, 180, 90)
            Line((0, CONG_3_R), (0, 0))
            Line((0, 0), (CONG_3_R, 0))
        make_face()
    cong_3_2_piece_3 = extrude(amount=7.828427125, mode=Mode.PRIVATE)
    cong_3_2_piece_3 = split(cong_3_2_piece_3, bisect_by=Plane(origin=(2.5, -24.267766953, -29), z_dir=(0, 0, -1)), keep=Keep.TOP, mode=Mode.PRIVATE)
    add(cong_3_2_piece_3, mode=Mode.SUBTRACT)
    with BuildSketch(Plane(origin=(4.5, -3.5, -32.951941016), x_dir=(1, 0, 0), z_dir=(0, 0, 1)), Plane(origin=(-4.5, -3.5, -32.951941016), x_dir=(0.2425356250363331, -0.9701425001453319, 0), z_dir=(0, 0, 1))) as cong_3_2_piece_4:
        with BuildLine():
            CenterArc((CONG_3_R * 0.780776406404, -CONG_3_R), CONG_3_R, 90, 75.963756532)
            Line((-CONG_3_R * 0.189366093741, -CONG_3_R * 0.757464374964), (0, 0))
            Line((0, 0), (CONG_3_R * 0.780776406404, 0))
        make_face()
    extrude(amount=3.951941016, mode=Mode.SUBTRACT)
    with BuildSketch(Plane(origin=(-2.5, -24.267766953, -27.232233047), x_dir=(0, 0.7071067811865476, 0.7071067811865476), z_dir=(0, 0.7071067811865476, -0.7071067811865476))) as cong_3_2_piece_5_section:
        with BuildLine():
            CenterArc((CONG_3_R, -CONG_3_R), CONG_3_R, 90, 90)
            Line((0, -CONG_3_R), (0, 0))
            Line((0, 0), (CONG_3_R, 0))
        make_face()
    cong_3_2_piece_5 = extrude(amount=7.828427125, mode=Mode.PRIVATE)
    cong_3_2_piece_5 = split(cong_3_2_piece_5, bisect_by=Plane(origin=(-2.5, -24.267766953, -29), z_dir=(0, 0, -1)), keep=Keep.TOP, mode=Mode.PRIVATE)
    add(cong_3_2_piece_5, mode=Mode.SUBTRACT)
    with BuildSketch(Plane(origin=(8.035533906, -18.5, 0), x_dir=(0, -0.7071067811865465, -0.7071067811865486), z_dir=(-1, 0, 0))) as cong_3_2_piece_6:
        with BuildLine():
            CenterArc((CONG_3_R * 0.414213562373, -CONG_3_R), CONG_3_R, 90, 45)
            Line((-CONG_3_R * 0.292893218813, -CONG_3_R * 0.292893218813), (0, 0))
            Line((0, 0), (CONG_3_R * 0.414213562373, 0))
        make_face()
    extrude(amount=16.071067812, mode=Mode.SUBTRACT)
    with BuildSketch(Plane(origin=(-9.5, 22.5, -2), x_dir=(0, -1, 0), z_dir=(1, 0, 0))) as cong_3_2_piece_7:
        with BuildLine():
            CenterArc((CONG_3_R, CONG_3_R), CONG_3_R, 180, 90)
            Line((0, CONG_3_R), (0, 0))
            Line((0, 0), (CONG_3_R, 0))
        make_face()
    extrude(amount=19, mode=Mode.SUBTRACT)
    with BuildSketch(Plane(origin=(-1.5, -18.468245837, -31), x_dir=(0.7793111641700136, -0.6266371433293579, 0), z_dir=(-0.6266371433293579, -0.7793111641700136, 0))) as cong_3_2_piece_8:
        with BuildLine():
            CenterArc((1 + CONG_3_R, CONG_3_R), CONG_3_R, 180, 90)
            Line((1, CONG_3_R), (1, 0))
            Line((1, 0), (1 + CONG_3_R, 0))
        make_face()
    revolve(axis=Axis((-1.5, -18.468245837, -31), (0, 0, 1)), revolution_arc=218.802450559, mode=Mode.SUBTRACT)
    with BuildSketch(Plane(origin=(1.5, -18.468245837, -31), x_dir=(1, 0, 0), z_dir=(0, -1, 0))) as cong_3_2_piece_9:
        with BuildLine():
            CenterArc((1 + CONG_3_R, CONG_3_R), CONG_3_R, 180, 90)
            Line((1, CONG_3_R), (1, 0))
            Line((1, 0), (1 + CONG_3_R, 0))
        make_face()
    revolve(axis=Axis((1.5, -18.468245837, -31), (0, 0, 1)), revolution_arc=218.802450559, mode=Mode.SUBTRACT)


solid = part.part
